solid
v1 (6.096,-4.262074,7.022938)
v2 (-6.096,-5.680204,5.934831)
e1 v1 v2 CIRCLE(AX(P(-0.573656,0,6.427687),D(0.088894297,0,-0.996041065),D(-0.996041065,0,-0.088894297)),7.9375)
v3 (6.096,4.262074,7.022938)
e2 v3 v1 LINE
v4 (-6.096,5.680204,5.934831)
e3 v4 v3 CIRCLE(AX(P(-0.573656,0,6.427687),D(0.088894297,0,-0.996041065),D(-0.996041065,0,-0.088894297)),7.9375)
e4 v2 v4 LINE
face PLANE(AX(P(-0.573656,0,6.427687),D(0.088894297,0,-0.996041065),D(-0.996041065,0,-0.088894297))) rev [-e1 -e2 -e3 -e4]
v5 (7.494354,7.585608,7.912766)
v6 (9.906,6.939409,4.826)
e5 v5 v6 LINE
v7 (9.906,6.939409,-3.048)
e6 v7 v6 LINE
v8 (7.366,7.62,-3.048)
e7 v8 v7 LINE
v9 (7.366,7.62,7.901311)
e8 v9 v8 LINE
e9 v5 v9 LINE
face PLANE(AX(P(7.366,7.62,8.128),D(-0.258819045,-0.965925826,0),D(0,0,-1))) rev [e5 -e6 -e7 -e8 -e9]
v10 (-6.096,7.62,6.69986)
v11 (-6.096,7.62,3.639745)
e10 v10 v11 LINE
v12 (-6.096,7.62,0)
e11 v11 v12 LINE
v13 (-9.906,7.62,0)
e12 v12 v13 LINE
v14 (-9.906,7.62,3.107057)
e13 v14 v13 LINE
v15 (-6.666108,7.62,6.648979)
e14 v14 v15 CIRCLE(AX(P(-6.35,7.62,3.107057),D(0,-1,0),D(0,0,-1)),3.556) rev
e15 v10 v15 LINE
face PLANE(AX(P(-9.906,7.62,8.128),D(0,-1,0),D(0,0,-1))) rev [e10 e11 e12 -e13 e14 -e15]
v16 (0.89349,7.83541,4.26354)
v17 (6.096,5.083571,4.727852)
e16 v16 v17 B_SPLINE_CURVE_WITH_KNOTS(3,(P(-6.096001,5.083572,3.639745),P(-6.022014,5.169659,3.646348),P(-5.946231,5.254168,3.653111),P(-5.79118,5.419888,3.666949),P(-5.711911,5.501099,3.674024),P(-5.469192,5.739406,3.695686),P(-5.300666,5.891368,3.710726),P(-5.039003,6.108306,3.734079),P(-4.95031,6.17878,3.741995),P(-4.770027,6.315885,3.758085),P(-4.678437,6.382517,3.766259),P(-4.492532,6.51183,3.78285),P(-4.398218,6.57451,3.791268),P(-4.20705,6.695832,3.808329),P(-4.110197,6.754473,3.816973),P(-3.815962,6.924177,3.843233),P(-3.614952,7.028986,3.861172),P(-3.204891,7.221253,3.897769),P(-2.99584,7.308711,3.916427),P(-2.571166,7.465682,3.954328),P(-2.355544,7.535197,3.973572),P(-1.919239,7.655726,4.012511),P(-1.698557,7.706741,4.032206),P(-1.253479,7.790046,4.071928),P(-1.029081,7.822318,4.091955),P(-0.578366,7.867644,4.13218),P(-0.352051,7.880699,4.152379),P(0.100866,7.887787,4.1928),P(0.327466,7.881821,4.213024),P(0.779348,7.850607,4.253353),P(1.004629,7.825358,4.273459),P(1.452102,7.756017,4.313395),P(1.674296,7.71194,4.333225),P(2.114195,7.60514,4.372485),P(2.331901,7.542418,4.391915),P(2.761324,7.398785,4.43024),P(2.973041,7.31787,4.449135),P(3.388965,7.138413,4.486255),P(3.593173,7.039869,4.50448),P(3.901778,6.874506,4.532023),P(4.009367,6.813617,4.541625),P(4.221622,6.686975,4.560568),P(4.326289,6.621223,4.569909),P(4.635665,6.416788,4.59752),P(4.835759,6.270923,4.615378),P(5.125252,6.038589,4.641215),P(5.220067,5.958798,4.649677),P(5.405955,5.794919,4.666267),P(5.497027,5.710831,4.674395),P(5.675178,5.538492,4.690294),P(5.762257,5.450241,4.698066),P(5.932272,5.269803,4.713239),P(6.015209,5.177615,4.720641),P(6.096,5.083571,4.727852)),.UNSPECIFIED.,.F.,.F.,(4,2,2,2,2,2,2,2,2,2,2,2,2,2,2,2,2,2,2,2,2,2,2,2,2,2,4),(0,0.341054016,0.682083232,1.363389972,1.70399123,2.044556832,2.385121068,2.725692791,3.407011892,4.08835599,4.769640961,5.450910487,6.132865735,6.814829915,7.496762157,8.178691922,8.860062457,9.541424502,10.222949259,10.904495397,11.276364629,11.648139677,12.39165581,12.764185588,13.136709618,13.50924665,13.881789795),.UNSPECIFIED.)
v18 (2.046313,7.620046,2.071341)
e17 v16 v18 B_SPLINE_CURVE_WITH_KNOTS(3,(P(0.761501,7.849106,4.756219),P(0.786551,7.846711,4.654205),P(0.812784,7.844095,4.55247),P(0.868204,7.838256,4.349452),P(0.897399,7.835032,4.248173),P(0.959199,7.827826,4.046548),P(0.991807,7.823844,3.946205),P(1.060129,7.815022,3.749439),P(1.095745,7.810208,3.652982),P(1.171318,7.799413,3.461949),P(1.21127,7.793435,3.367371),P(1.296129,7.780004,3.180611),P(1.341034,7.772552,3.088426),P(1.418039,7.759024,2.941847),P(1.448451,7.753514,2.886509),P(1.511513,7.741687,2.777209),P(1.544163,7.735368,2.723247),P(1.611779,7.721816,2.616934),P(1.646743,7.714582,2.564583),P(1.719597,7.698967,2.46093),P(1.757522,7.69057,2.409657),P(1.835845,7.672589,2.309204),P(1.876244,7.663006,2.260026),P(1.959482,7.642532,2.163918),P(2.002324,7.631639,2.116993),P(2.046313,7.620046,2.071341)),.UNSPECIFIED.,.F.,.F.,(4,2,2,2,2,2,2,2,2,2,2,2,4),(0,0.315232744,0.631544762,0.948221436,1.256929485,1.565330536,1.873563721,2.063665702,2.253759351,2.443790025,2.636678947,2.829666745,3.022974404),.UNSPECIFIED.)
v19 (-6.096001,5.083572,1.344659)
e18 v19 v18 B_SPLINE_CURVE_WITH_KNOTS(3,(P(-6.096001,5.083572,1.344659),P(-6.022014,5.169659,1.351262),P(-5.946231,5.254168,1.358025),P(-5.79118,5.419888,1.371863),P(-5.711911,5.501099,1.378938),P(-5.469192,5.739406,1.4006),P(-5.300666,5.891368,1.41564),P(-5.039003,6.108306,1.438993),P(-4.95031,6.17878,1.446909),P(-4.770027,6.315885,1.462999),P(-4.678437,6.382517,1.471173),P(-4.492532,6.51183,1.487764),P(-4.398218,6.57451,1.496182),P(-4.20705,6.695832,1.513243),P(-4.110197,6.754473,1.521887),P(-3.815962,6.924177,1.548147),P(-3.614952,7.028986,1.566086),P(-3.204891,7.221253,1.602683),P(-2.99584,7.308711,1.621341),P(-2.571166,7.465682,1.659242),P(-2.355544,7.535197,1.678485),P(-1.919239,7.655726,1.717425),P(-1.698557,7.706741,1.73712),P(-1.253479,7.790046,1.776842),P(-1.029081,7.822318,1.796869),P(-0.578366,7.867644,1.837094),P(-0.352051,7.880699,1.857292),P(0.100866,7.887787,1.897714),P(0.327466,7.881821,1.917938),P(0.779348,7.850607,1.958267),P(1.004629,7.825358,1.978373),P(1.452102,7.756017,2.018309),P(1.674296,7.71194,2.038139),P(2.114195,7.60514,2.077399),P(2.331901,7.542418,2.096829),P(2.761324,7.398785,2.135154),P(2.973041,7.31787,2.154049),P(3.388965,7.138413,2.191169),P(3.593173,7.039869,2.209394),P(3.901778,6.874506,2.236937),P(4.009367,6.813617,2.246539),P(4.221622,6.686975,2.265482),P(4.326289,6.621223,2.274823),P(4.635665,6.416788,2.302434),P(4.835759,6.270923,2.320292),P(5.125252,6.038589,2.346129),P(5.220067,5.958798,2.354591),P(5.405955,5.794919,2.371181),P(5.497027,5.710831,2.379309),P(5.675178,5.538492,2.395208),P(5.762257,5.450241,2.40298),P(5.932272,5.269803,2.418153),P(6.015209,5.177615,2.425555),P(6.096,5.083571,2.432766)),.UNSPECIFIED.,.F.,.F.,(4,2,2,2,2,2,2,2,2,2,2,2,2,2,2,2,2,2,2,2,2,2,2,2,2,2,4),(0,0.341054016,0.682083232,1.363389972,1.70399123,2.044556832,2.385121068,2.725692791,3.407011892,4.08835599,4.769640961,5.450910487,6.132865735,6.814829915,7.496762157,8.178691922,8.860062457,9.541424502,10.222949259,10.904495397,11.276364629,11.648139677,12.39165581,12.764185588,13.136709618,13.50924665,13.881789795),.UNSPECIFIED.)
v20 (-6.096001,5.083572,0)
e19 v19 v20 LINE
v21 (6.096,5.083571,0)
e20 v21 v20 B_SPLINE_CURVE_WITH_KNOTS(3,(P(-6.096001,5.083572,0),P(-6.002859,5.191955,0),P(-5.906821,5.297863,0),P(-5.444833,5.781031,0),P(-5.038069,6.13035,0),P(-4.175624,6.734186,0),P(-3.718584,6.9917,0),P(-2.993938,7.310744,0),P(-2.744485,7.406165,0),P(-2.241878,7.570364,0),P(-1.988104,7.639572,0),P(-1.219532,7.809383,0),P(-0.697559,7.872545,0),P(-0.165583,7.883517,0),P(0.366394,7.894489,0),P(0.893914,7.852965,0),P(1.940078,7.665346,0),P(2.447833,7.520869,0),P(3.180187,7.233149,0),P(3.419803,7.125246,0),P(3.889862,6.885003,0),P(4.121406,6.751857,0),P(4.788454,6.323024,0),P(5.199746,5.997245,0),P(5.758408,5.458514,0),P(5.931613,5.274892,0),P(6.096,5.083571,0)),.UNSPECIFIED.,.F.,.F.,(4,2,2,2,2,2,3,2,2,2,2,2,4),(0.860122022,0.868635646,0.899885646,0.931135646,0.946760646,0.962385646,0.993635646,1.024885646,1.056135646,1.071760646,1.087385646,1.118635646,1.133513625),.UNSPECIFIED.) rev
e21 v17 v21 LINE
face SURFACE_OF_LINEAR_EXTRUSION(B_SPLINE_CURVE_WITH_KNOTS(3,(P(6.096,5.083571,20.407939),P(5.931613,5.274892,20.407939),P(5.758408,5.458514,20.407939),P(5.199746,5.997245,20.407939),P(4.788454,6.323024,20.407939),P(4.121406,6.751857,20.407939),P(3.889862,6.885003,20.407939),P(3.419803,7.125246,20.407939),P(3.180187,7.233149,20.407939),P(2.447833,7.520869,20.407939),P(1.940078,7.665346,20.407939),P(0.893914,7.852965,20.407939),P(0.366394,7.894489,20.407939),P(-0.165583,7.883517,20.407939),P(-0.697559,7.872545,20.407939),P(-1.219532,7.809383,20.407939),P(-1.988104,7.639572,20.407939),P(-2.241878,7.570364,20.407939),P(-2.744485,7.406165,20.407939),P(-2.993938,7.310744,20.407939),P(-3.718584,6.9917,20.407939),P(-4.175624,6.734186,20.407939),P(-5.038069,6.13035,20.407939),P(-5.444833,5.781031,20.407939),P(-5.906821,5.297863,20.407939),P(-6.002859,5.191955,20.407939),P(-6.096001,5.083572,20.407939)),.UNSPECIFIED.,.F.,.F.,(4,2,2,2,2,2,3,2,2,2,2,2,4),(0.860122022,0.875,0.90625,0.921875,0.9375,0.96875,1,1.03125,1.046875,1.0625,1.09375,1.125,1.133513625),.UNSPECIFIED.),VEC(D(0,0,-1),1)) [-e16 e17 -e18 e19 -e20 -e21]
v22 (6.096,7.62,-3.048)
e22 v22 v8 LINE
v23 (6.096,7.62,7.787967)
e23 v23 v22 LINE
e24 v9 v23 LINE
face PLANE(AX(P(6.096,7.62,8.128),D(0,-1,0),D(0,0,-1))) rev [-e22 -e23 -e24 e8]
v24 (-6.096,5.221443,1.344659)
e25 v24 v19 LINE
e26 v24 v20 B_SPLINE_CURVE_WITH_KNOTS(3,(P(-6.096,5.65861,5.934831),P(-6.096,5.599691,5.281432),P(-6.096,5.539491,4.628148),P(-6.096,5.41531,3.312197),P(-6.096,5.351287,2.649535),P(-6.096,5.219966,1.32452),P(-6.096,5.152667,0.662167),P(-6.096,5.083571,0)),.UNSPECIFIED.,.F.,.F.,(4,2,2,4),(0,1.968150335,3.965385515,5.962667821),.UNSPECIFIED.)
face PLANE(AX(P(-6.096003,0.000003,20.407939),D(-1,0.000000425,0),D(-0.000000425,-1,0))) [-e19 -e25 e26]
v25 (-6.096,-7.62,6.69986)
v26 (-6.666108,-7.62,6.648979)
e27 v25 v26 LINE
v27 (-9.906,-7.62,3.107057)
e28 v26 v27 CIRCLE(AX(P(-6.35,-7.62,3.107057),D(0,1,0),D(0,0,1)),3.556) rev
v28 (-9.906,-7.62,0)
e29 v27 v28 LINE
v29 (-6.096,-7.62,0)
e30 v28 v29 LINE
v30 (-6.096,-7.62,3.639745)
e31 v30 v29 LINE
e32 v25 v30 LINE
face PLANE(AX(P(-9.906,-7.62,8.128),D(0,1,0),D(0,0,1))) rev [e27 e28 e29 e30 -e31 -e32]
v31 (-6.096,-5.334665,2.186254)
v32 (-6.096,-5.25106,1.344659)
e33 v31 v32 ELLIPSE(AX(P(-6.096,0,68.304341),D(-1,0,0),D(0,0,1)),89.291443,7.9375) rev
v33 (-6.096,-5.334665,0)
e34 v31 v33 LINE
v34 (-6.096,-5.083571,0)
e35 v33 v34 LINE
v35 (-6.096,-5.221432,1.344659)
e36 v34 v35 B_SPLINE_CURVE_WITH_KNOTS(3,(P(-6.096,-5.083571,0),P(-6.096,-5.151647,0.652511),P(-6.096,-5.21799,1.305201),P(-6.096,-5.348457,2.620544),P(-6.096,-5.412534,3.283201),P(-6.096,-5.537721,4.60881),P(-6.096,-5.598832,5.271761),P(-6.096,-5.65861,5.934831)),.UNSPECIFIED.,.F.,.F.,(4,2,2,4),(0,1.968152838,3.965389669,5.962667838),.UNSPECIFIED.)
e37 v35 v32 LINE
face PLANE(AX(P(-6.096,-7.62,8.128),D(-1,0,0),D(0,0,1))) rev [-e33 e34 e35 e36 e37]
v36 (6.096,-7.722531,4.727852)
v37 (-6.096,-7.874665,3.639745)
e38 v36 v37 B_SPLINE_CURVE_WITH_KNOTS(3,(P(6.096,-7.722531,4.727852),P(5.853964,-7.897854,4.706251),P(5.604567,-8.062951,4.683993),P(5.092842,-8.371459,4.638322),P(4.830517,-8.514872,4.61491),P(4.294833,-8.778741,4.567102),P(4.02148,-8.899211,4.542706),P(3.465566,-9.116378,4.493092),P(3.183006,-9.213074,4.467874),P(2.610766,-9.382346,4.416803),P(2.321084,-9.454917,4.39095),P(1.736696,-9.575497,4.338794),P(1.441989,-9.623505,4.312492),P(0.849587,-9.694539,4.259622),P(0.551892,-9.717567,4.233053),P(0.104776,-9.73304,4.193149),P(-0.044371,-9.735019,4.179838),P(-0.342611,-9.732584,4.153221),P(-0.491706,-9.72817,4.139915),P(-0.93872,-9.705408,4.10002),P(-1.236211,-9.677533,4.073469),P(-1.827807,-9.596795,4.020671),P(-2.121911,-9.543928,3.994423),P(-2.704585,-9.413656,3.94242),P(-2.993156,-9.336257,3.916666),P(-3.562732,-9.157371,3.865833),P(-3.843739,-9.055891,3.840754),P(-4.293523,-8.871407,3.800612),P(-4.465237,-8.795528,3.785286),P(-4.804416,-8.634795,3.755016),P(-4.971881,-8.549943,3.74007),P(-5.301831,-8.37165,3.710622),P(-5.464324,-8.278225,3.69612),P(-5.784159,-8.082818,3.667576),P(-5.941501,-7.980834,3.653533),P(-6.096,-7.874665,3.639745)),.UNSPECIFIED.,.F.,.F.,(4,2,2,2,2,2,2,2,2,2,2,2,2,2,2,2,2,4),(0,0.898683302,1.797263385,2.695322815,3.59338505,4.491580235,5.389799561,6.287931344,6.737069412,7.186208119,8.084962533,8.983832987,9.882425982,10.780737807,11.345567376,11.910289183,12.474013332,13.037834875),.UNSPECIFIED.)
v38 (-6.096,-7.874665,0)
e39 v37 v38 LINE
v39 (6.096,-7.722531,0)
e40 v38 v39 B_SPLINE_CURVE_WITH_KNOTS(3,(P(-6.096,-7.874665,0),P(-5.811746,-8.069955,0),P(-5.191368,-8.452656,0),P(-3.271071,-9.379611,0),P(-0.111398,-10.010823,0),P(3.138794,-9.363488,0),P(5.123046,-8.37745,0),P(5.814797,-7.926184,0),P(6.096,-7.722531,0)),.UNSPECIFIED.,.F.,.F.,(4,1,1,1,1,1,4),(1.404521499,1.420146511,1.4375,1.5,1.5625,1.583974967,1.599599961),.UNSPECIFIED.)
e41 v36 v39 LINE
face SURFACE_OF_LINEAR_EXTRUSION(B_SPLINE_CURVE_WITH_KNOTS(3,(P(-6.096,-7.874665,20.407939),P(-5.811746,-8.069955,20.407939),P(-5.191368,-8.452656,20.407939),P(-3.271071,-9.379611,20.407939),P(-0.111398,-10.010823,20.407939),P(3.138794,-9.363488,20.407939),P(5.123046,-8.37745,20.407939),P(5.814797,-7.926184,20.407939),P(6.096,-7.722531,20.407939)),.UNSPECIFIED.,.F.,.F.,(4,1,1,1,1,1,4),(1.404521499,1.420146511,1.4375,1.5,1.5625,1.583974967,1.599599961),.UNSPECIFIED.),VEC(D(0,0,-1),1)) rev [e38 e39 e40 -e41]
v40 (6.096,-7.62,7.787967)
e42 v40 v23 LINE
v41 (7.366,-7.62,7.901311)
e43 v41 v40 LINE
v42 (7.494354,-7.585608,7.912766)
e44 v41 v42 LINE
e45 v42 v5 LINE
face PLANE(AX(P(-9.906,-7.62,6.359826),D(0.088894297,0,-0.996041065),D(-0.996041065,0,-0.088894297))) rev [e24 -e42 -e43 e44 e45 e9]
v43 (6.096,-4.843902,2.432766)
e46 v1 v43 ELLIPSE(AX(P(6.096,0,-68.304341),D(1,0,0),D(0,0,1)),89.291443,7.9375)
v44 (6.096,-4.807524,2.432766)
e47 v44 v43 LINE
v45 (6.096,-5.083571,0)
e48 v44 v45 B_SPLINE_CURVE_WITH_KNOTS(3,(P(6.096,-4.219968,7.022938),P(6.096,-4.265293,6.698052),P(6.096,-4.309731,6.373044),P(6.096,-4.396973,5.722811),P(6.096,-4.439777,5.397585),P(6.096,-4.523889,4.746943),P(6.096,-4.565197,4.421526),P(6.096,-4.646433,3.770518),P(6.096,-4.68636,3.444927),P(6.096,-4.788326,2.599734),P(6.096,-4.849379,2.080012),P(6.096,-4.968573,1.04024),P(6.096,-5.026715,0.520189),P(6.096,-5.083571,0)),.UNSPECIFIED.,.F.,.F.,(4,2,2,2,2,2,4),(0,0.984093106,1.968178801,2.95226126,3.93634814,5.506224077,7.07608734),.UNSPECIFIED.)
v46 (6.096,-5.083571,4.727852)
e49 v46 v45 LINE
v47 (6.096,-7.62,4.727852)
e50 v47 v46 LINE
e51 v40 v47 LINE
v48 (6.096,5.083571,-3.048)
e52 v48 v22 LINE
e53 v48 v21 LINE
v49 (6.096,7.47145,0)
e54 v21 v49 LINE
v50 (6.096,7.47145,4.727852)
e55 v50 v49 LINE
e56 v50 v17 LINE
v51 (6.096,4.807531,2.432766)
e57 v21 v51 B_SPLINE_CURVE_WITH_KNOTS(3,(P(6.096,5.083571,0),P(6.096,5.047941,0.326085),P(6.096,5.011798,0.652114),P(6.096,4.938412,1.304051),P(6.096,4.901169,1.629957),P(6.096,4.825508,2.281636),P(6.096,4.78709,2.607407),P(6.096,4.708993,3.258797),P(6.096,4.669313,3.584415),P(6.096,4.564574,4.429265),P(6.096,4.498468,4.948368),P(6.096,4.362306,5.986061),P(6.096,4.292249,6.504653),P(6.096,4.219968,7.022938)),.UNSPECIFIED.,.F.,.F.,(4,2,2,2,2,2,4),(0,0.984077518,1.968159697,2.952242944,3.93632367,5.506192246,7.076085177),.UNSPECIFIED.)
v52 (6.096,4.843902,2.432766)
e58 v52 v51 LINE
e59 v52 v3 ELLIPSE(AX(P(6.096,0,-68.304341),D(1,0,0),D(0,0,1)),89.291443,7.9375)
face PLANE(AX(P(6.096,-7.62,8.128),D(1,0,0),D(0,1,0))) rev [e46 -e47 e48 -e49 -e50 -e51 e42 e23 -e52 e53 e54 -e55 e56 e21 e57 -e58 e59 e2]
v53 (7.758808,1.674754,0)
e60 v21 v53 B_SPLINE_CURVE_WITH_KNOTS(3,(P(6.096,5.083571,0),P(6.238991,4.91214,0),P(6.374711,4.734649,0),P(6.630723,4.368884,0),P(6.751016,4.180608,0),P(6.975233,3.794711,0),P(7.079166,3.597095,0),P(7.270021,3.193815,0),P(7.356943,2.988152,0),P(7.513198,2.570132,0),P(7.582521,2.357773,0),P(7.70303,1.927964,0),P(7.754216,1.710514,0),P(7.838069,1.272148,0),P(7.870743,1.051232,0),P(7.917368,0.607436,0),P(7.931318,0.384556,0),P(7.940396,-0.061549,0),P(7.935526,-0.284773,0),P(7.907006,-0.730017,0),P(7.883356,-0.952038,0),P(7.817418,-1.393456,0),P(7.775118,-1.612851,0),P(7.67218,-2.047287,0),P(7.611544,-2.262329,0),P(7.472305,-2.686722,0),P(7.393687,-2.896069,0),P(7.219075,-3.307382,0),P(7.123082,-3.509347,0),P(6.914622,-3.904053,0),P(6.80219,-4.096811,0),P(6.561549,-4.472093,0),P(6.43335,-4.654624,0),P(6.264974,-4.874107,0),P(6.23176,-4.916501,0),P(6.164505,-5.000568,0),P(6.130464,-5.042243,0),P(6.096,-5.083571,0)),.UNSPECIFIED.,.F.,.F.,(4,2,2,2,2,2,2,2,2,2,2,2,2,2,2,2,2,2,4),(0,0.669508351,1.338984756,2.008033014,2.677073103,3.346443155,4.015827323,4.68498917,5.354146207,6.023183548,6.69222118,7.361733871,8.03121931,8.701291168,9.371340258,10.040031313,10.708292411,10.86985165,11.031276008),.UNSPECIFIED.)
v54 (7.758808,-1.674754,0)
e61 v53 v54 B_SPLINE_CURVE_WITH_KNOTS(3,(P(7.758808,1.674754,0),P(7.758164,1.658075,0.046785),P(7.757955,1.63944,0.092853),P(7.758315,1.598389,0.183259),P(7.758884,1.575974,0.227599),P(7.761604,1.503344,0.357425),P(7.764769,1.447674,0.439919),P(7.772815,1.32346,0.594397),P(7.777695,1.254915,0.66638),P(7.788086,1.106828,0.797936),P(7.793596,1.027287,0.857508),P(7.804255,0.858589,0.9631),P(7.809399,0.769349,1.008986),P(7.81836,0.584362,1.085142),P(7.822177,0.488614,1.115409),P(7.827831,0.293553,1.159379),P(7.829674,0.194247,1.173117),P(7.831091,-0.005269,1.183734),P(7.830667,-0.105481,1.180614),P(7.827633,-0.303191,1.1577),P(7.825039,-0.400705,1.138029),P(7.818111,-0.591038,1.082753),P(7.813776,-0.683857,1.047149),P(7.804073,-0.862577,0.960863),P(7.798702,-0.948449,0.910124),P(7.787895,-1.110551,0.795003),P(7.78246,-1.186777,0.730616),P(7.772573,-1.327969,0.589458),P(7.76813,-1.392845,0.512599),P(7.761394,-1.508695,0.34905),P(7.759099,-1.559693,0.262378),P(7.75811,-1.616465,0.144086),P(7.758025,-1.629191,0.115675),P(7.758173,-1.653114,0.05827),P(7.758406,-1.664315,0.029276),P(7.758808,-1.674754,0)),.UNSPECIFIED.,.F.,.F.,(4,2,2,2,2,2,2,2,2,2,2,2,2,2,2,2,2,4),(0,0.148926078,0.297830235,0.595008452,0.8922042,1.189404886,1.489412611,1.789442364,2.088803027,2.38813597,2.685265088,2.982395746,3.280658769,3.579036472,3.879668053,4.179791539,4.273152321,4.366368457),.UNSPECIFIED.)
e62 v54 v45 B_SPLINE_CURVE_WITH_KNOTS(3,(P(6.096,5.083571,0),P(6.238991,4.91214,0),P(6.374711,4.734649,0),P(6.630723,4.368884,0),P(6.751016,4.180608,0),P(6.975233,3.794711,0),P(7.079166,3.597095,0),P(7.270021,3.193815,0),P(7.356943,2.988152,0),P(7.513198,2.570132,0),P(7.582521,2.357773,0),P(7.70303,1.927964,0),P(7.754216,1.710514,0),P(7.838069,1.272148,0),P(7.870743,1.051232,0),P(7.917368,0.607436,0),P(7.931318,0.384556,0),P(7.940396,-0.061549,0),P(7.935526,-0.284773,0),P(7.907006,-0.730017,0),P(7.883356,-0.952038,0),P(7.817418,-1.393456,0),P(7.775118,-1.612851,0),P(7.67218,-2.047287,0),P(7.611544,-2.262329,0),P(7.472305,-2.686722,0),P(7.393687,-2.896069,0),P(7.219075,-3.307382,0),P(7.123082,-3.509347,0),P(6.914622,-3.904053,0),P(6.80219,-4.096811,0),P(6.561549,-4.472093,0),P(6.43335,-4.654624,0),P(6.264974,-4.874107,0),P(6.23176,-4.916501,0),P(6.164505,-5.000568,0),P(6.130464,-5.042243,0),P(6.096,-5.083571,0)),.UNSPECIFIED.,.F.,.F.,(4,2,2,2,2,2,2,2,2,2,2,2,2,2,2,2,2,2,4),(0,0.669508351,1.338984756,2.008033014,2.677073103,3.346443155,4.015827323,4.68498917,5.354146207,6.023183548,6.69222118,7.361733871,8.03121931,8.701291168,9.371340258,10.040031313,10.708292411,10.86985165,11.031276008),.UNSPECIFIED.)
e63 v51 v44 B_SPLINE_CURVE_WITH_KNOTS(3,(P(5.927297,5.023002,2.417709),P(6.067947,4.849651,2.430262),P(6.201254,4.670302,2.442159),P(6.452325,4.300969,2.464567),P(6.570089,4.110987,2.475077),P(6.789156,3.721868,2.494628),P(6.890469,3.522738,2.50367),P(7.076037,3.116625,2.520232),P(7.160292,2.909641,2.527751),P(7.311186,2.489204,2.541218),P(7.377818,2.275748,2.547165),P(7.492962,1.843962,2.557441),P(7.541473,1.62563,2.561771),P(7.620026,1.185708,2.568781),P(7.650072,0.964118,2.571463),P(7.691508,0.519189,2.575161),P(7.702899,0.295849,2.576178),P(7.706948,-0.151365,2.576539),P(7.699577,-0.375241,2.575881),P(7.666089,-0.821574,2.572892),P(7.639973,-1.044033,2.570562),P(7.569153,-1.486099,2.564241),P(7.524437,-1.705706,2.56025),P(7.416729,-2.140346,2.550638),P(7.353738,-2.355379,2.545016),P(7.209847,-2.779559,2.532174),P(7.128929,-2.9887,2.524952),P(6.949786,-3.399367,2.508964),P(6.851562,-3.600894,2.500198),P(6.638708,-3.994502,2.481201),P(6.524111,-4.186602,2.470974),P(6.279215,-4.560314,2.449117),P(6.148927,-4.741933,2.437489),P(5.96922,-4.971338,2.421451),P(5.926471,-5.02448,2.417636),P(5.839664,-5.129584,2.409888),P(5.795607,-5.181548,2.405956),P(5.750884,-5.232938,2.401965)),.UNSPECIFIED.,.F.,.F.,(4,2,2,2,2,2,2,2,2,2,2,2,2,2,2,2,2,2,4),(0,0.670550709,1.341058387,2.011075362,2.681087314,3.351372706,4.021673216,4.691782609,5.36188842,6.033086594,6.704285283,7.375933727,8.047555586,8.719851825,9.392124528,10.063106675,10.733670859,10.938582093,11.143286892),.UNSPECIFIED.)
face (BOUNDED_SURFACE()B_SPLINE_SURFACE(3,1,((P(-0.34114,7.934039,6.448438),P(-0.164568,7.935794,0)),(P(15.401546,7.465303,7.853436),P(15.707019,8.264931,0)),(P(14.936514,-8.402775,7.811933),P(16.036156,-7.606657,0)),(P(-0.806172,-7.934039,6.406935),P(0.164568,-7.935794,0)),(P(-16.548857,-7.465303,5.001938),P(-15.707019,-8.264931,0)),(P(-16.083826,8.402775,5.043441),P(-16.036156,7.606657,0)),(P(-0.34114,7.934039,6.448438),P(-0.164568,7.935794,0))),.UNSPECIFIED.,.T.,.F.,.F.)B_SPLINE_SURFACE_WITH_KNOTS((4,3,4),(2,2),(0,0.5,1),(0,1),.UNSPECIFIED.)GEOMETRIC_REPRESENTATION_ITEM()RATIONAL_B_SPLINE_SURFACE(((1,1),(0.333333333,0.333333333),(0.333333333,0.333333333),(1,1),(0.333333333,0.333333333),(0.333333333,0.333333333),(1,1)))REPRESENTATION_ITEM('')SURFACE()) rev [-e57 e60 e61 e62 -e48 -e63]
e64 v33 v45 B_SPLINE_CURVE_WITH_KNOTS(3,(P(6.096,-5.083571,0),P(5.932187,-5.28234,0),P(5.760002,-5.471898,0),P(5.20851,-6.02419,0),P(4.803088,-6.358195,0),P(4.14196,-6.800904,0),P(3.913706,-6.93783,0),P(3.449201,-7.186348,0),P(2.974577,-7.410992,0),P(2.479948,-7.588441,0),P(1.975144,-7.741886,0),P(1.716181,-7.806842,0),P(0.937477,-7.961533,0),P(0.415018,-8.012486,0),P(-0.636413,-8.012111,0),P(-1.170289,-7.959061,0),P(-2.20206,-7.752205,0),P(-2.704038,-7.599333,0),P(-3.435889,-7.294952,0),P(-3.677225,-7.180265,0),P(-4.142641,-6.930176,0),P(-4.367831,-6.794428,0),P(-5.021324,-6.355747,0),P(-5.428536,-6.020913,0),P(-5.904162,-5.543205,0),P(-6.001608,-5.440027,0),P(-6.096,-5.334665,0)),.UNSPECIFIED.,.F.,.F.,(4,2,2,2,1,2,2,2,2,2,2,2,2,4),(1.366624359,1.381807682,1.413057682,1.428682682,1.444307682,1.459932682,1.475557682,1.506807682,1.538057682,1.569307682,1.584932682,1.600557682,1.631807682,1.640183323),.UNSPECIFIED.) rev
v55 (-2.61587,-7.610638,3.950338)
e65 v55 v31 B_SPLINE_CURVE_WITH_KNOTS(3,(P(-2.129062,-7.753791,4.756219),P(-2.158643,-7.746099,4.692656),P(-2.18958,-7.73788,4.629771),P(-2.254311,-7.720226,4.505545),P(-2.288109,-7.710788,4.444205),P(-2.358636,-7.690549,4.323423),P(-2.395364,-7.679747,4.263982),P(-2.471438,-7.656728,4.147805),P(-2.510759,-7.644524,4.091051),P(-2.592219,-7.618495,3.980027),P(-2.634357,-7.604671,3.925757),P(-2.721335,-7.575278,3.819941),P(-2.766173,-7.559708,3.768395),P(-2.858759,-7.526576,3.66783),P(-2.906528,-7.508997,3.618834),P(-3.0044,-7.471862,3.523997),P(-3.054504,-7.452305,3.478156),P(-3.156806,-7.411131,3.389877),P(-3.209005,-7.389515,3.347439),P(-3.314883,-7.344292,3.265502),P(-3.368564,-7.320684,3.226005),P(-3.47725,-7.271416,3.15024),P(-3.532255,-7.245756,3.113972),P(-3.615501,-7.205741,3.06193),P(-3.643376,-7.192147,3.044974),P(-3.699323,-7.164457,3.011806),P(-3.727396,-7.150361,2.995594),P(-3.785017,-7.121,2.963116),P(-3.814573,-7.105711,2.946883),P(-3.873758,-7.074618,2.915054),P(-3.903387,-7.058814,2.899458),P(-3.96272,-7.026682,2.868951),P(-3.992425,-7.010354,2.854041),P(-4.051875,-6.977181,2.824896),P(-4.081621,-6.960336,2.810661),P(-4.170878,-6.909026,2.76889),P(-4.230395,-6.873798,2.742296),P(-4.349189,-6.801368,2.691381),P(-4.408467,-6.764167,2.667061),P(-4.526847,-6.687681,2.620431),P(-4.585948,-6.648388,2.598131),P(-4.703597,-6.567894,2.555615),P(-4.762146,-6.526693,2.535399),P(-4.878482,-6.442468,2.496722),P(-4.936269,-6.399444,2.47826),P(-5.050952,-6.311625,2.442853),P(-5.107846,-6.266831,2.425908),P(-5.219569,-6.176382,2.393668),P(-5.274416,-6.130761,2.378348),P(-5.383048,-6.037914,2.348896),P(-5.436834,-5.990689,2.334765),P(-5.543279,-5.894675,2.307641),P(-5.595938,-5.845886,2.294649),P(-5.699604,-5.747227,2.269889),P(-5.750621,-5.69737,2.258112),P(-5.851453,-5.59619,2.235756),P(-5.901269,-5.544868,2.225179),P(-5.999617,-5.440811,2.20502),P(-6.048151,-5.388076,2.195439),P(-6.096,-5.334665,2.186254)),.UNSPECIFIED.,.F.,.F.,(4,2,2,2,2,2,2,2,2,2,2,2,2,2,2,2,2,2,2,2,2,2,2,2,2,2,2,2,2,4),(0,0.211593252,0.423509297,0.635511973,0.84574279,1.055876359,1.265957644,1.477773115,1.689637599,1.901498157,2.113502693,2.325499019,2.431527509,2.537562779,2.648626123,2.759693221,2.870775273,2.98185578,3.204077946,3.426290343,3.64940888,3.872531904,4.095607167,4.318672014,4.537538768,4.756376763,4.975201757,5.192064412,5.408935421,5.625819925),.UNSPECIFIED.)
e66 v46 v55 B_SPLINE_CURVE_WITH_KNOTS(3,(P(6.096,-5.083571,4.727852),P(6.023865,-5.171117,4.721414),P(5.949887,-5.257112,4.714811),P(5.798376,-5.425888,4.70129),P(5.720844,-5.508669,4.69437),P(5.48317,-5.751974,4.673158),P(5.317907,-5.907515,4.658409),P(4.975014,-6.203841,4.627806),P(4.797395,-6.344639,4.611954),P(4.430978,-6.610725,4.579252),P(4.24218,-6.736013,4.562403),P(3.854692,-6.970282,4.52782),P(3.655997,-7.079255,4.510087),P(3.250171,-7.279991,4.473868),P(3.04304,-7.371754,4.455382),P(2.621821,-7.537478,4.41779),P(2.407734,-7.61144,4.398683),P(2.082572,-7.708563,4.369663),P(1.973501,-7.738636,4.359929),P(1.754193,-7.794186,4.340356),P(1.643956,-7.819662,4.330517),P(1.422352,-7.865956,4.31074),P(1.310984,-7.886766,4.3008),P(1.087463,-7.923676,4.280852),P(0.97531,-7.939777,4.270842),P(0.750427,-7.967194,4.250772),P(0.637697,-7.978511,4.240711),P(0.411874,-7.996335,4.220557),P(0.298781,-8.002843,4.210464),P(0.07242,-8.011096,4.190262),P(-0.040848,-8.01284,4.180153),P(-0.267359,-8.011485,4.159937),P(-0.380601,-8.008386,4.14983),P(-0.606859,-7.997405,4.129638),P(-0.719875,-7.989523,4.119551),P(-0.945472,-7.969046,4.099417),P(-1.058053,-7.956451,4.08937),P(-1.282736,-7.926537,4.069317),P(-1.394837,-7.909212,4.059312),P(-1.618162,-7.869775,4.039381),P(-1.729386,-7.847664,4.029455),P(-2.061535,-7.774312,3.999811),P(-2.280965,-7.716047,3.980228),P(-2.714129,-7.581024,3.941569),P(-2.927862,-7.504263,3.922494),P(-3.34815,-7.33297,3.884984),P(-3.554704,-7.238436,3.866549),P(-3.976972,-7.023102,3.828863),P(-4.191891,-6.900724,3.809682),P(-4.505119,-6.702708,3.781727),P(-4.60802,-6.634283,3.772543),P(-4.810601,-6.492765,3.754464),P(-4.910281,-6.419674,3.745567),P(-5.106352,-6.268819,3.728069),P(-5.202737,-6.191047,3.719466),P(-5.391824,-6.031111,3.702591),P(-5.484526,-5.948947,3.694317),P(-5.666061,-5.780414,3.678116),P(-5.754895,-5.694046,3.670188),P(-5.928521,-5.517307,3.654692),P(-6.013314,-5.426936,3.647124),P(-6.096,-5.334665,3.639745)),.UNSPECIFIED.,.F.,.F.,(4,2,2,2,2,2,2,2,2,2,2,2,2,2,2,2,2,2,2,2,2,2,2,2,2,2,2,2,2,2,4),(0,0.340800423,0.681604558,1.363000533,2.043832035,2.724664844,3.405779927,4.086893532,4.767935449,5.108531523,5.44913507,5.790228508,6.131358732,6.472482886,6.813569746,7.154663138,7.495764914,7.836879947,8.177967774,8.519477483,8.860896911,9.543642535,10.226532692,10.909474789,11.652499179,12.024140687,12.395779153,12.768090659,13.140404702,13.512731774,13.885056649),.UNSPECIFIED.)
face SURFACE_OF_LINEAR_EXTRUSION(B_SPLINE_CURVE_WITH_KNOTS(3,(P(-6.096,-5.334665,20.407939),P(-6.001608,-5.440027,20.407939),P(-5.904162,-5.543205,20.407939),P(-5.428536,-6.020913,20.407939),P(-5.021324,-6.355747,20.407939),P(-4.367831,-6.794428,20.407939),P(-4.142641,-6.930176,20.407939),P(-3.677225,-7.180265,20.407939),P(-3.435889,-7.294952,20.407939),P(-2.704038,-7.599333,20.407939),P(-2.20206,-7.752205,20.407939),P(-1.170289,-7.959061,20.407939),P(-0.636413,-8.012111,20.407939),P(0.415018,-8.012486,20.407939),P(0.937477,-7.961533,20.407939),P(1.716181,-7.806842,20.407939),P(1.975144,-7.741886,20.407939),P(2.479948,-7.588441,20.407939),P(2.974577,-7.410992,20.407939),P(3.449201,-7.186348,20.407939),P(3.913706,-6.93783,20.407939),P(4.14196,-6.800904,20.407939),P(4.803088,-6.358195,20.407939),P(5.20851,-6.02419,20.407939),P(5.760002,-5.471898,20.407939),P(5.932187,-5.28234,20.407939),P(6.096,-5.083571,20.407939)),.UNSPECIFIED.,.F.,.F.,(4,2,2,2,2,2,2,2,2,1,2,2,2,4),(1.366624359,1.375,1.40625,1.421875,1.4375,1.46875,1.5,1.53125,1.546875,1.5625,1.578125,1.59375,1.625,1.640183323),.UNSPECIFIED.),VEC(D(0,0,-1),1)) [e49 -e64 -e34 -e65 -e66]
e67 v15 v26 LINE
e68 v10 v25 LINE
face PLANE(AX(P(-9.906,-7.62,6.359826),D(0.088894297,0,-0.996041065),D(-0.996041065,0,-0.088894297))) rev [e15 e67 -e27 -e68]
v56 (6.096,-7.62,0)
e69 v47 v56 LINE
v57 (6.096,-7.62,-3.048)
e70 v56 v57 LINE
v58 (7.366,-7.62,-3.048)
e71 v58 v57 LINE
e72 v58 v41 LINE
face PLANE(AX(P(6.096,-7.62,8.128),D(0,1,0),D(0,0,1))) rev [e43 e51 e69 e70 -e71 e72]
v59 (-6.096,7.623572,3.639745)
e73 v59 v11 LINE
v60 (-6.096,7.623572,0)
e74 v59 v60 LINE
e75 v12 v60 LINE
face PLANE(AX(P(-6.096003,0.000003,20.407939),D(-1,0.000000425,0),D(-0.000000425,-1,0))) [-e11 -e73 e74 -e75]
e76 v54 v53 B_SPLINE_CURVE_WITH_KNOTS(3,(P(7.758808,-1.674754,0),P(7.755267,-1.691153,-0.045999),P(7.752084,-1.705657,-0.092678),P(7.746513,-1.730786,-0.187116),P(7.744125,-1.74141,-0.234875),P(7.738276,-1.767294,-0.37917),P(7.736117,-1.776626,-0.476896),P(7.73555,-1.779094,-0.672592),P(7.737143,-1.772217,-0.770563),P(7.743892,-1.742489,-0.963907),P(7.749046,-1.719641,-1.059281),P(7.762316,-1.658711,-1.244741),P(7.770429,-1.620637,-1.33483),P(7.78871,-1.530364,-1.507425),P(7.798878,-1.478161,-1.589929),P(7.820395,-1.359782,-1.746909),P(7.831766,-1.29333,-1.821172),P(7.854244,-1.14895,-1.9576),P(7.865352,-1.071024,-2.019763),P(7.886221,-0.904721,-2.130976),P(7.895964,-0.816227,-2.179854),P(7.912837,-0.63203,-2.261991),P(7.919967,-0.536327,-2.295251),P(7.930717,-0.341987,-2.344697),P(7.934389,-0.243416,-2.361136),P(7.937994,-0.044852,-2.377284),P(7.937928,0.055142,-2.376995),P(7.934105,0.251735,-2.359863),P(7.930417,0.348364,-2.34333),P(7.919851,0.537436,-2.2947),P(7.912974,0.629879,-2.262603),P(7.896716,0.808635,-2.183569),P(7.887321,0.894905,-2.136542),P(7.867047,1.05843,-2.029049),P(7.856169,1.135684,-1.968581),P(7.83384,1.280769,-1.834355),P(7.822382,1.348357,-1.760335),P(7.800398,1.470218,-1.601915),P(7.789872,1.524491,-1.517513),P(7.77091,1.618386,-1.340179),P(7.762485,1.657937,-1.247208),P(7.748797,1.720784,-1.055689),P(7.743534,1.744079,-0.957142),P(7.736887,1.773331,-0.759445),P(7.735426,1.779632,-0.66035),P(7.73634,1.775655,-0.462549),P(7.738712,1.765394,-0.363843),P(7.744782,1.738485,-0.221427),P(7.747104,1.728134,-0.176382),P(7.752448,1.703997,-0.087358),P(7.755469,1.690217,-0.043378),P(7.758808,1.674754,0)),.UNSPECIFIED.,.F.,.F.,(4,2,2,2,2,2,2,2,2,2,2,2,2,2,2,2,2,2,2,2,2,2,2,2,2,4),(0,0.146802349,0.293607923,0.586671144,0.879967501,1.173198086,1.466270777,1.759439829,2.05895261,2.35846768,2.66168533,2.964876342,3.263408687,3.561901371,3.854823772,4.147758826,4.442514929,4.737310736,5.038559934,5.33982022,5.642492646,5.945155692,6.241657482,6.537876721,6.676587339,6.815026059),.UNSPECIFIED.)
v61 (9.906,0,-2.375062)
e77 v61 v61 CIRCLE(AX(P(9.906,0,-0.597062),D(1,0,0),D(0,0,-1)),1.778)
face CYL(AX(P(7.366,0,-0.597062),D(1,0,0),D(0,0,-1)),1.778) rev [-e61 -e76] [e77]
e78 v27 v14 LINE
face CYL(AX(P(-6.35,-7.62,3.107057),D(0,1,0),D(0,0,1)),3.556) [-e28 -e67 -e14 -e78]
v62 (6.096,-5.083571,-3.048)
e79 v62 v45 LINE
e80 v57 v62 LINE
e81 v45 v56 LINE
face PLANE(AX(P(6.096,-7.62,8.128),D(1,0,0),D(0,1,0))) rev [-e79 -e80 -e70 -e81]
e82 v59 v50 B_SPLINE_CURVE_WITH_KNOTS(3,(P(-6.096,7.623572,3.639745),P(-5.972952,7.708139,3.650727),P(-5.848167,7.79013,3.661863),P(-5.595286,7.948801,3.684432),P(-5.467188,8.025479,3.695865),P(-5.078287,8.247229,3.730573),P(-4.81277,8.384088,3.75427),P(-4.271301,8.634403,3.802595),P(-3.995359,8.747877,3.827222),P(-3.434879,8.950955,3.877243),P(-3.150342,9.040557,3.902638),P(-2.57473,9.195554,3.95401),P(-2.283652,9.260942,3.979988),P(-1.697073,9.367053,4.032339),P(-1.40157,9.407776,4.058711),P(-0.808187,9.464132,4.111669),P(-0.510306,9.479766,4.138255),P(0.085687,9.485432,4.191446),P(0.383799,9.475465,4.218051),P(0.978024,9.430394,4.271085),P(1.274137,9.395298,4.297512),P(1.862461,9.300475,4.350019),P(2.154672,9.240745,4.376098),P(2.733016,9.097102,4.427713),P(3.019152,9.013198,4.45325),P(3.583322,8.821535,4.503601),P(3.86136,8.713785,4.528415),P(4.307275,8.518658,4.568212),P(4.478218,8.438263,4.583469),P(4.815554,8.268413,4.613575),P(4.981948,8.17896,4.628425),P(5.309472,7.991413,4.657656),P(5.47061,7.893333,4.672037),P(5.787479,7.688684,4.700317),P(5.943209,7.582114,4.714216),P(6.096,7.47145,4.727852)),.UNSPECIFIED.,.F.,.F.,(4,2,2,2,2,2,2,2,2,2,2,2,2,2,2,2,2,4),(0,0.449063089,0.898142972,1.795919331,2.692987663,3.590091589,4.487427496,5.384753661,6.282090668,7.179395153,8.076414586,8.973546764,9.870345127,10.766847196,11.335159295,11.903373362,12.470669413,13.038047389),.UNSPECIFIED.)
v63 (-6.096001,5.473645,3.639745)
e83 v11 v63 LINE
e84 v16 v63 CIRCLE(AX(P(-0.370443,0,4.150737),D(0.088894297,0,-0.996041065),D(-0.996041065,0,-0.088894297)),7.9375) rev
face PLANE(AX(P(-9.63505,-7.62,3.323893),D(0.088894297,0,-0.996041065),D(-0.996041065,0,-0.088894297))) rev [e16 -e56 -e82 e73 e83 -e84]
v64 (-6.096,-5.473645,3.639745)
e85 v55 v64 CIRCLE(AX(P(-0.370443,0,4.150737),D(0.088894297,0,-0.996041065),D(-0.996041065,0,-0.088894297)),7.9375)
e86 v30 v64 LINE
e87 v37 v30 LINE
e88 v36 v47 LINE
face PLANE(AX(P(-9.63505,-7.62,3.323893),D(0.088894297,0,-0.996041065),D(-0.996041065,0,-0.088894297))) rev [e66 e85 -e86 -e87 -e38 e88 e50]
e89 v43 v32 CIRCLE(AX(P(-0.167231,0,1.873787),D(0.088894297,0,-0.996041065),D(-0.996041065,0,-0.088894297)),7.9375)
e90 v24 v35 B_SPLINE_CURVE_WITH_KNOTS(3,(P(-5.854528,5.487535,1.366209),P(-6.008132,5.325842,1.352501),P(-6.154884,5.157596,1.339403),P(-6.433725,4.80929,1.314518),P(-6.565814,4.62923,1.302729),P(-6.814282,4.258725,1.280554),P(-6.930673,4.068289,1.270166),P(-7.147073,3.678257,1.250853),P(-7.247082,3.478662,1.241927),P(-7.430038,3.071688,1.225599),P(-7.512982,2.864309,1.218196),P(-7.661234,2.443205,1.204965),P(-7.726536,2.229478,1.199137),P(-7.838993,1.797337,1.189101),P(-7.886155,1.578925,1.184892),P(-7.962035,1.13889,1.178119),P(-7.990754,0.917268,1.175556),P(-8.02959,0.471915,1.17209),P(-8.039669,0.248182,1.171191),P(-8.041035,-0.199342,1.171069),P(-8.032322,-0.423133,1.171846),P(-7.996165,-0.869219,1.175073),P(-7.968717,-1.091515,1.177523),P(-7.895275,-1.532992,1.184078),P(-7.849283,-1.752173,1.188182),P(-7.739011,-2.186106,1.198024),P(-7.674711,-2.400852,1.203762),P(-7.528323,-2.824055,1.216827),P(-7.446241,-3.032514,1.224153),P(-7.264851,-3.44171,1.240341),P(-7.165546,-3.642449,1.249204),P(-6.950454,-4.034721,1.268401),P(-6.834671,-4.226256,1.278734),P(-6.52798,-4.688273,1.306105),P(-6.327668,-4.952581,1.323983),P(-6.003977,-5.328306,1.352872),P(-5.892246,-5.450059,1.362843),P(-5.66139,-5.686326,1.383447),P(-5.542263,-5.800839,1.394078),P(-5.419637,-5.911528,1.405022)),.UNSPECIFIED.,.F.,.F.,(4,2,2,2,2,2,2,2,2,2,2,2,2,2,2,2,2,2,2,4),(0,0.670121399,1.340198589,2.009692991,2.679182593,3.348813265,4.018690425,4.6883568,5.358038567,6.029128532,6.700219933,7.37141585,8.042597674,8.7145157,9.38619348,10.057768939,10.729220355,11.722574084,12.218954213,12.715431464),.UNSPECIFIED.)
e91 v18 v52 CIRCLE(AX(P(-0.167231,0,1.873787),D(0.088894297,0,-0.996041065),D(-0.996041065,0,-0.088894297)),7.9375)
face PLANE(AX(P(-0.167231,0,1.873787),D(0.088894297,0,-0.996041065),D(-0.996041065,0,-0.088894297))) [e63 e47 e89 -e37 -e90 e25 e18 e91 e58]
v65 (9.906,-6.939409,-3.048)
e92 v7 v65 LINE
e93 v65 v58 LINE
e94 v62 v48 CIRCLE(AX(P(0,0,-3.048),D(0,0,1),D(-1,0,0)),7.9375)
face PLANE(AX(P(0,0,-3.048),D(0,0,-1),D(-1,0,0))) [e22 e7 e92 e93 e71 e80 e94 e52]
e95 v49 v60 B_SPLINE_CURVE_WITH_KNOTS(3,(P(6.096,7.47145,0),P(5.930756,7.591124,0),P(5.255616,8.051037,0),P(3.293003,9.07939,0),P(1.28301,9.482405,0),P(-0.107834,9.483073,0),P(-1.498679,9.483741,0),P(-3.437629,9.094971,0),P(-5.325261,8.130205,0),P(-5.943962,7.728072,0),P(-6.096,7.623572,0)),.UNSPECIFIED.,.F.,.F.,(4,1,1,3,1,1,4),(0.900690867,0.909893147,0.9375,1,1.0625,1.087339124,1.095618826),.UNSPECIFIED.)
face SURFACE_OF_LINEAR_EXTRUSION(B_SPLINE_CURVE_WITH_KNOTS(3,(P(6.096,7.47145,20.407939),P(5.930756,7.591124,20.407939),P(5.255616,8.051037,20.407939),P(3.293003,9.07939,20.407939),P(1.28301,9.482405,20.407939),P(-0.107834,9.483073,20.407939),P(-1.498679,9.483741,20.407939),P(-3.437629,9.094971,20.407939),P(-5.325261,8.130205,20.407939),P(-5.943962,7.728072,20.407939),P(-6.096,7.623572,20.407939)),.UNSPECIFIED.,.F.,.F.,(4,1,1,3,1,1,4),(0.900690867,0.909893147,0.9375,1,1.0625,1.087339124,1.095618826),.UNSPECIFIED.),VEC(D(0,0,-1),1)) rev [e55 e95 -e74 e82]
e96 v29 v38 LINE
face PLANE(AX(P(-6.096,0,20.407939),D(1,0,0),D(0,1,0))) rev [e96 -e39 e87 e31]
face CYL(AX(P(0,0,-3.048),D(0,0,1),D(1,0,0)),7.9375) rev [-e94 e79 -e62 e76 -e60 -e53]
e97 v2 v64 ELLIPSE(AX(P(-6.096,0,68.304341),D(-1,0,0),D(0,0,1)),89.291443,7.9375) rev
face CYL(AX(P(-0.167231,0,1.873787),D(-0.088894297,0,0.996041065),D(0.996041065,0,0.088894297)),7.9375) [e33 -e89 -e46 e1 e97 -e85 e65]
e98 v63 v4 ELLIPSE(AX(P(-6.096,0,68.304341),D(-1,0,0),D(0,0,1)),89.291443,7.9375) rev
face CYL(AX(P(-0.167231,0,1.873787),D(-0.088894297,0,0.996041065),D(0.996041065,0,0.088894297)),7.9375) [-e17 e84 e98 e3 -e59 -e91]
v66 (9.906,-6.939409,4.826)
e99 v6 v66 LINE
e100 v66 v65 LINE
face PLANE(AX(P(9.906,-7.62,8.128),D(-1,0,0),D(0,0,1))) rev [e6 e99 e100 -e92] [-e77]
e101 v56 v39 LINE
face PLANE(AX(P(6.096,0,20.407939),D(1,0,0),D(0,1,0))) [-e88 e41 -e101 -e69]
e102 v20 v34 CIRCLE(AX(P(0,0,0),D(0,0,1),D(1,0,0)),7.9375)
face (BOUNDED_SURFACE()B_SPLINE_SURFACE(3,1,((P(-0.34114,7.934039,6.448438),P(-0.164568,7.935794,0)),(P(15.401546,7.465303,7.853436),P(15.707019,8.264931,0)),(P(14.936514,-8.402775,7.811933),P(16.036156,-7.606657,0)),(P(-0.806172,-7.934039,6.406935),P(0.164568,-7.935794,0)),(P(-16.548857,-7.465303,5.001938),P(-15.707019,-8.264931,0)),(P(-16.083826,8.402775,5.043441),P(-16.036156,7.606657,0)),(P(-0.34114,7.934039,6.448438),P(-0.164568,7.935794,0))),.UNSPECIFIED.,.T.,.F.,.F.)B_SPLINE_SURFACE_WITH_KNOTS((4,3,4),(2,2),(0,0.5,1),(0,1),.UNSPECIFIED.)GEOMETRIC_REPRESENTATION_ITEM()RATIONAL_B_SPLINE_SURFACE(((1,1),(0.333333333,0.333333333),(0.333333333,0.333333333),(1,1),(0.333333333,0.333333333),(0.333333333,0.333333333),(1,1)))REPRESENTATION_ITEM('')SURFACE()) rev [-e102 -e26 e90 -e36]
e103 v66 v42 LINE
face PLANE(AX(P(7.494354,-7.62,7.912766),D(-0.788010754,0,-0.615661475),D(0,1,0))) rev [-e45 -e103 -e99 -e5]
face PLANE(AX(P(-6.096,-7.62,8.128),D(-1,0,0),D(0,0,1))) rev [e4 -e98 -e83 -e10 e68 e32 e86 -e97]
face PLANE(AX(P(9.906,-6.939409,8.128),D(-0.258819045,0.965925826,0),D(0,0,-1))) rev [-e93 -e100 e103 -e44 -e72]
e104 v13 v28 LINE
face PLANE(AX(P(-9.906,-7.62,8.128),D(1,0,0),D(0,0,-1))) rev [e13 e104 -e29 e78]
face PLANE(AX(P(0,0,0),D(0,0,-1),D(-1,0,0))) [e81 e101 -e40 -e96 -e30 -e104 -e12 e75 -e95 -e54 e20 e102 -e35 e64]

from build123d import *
from OCP.BRepFilletAPI import BRepFilletAPI_MakeChamfer

# Parameters (mm, degrees)
SKETCH1_W                         = 3.81
SKETCH1_H                         = 15.24
BOSS_EXTRUDE1_DEPTH               = 8.128
BOSS_EXTRUDE1_2_DEPTH             = 8.128
CUT_EXTRUDE2_DEPTH                = 20.911072799
SKETCH12_R                        = 7.9375
MAGNET_DEPTH                      = 4.572
BOSS_EXTRUDE6_DEPTH               = 3.048
SKETCH14_R                        = 1.778
CUT_EXTRUDE4_DEPTH                = 2.54
CHAMFER3_SIZE                     = 2.54
CHAMFER3_SIZE2                    = 0.680590949
CHAMFER4_SIZE                     = 2.54
CHAMFER4_SIZE2                    = 0.680590949
CHAMFER5_SIZE                     = 3.302
CHAMFER5_SIZE2                    = 2.421231652
BOSS_EXTRUDE7_REACH               = 20.006
BOSS_EXTRUDE7_OFFSET_FROM_SURFACE = 3.048
FILLET1_R                         = 3.556


with BuildPart() as part:
    # Sketch1 → Boss-Extrude1 (new body)
    with BuildSketch(Plane.XY):
        with Locations((-8.001, 0)):
            Rectangle(SKETCH1_W, SKETCH1_H)
    extrude(amount=BOSS_EXTRUDE1_DEPTH)


with BuildPart() as body_2:
    # Sketch1 → Boss-Extrude1 2 (new body)
    with BuildSketch(Plane.XY):
        with Locations((8.001, 0)):
            Rectangle(SKETCH1_W, SKETCH1_H)
    extrude(amount=BOSS_EXTRUDE1_2_DEPTH)


with BuildPart() as cut_extrude2_tool:
    # Sketch6 → Cut-Extrude2 (new, through all)
    with BuildSketch(Plane(origin=(0, 7.62, 0), x_dir=(1, 0, 0), z_dir=(0, 1, 0))):
        Polygon((-9.906, -6.359826106), (9.906, -8.128), (-9.906, -8.128), align=None)
    extrude(amount=-CUT_EXTRUDE2_DEPTH)


with BuildPart() as part_1:
    add(part.part)

    # Cut-Extrude2: cut by cut_extrude2_tool
    add(cut_extrude2_tool.part, mode=Mode.SUBTRACT)

    # Cut-Loft1: read off the stored shape, not the designer's step
    # Cut-Loft1: loft between two sections, ruled curve by curve
    cut_loft1_from = [
        Edge.make_bspline([(-0.341139785, 7.934039191, 6.44843844), (15.401545931, 7.465303163, 7.853435709), (14.936513948, -8.402775219, 7.811932711), (-0.806171769, -7.934039191, 6.406935441), (-16.548857485, -7.465303163, 5.001938171), (-16.083825501, 8.402775219, 5.04344117), (-0.341139785, 7.934039191, 6.44843844)], [0, 0, 0, 0, 0.5, 0.5, 0.5, 1, 1, 1, 1], 3, [1, 0.333333333, 0.333333333, 1, 0.333333333, 0.333333333, 1]),
    ]
    cut_loft1_to = [
        Edge.make_bspline([(-0.164568393, 7.935793816, 0), (15.70701924, 8.264930602, 0), (16.036156025, -7.606657031, 0), (0.164568393, -7.935793816, 0), (-15.70701924, -8.264930602, 0), (-16.036156025, 7.606657031, 0), (-0.164568393, 7.935793816, 0)], [0, 0, 0, 0, 0.5, 0.5, 0.5, 1, 1, 1, 1], 3, [1, 0.333333333, 0.333333333, 1, 0.333333333, 0.333333333, 1]),
    ]
    cut_loft1 = Solid(Shell([*[Face.make_surface_from_curves(cut_loft1_from[k], cut_loft1_to[k]) for k in range(1)], Face(Wire(cut_loft1_from)), Face(Wire(cut_loft1_to))]))
    add(cut_loft1, mode=Mode.SUBTRACT)


with BuildPart() as body_2_1:
    add(body_2.part)

    # Cut-Extrude2: cut by cut_extrude2_tool
    add(cut_extrude2_tool.part, mode=Mode.SUBTRACT)

    # Cut-Loft1 2: loft between two sections, ruled curve by curve
    cut_loft1_2_from = [
        Edge.make_bspline([(-0.341139785, 7.934039191, 6.44843844), (15.401545931, 7.465303163, 7.853435709), (14.936513948, -8.402775219, 7.811932711), (-0.806171769, -7.934039191, 6.406935441), (-16.548857485, -7.465303163, 5.001938171), (-16.083825501, 8.402775219, 5.04344117), (-0.341139785, 7.934039191, 6.44843844)], [0, 0, 0, 0, 0.5, 0.5, 0.5, 1, 1, 1, 1], 3, [1, 0.333333333, 0.333333333, 1, 0.333333333, 0.333333333, 1]),
    ]
    cut_loft1_2_to = [
        Edge.make_bspline([(-0.164568393, 7.935793816, 0), (15.70701924, 8.264930602, 0), (16.036156025, -7.606657031, 0), (0.164568393, -7.935793816, 0), (-15.70701924, -8.264930602, 0), (-16.036156025, 7.606657031, 0), (-0.164568393, 7.935793816, 0)], [0, 0, 0, 0, 0.5, 0.5, 0.5, 1, 1, 1, 1], 3, [1, 0.333333333, 0.333333333, 1, 0.333333333, 0.333333333, 1]),
    ]
    cut_loft1_2 = Solid(Shell([*[Face.make_surface_from_curves(cut_loft1_2_from[k], cut_loft1_2_to[k]) for k in range(1)], Face(Wire(cut_loft1_2_from)), Face(Wire(cut_loft1_2_to))]))
    add(cut_loft1_2, mode=Mode.SUBTRACT)


with BuildPart() as body_3:
    # Sketch12 → Magnet (new body)
    with BuildSketch(Plane(origin=(-0.573655777, 0, 6.42768694), x_dir=(-0.9960410654107703, 0, -0.08889429686643446), z_dir=(0.08889429686643446, 0, -0.9960410654107703))):
        Circle(SKETCH12_R)
    extrude(amount=MAGNET_DEPTH)


with BuildPart() as body_4:
    # Sketch13 → Boss-Extrude6 (new body)
    with BuildSketch(Plane(origin=(0, 0, 0), x_dir=(-1, 0, 0), z_dir=(0, 0, -1))):
        with BuildLine():
            Line((-6.096, 5.08357062), (-6.096, 7.62))
            Line((-6.096, 7.62), (-9.906, 7.62))
            Line((-9.906, 7.62), (-9.906, -7.62))
            Line((-9.906, -7.62), (-6.096, -7.62))
            Line((-6.096, -7.62), (-6.096, -5.08357062))
            ThreePointArc((-6.096, -5.08357062), (-7.9375, 0), (-6.096, 5.08357062))
        make_face()
    extrude(amount=BOSS_EXTRUDE6_DEPTH)


with BuildPart() as cut_extrude4_tool:
    # Sketch14 → Cut-Extrude4 (new body)
    with BuildSketch(Plane(origin=(9.906, 0, 0), x_dir=(0, 0, -1), z_dir=(1, 0, 0))):
        with Locations((0.597062067, -1.1e-08)):
            Circle(SKETCH14_R)
    extrude(amount=-CUT_EXTRUDE4_DEPTH)


with BuildPart() as body_2_2:
    add(body_2_1.part)

    # Cut-Extrude4: cut by cut_extrude4_tool
    add(cut_extrude4_tool.part, mode=Mode.SUBTRACT)

    # Chamfer3: one chamfer whose edges measure the first distance from different faces: ONE call of the kernel's chamfer builder (chamfer() names one face for all edges)
    chamfer3_edges_1 = [body_2_2.edges().sort_by_distance(p)[0] for p in [
        (9.906, -7.62, 4.064),
    ]]
    chamfer3_side_1 = [body_2_2.faces().sort_by_distance(p)[0] for p in [
        (8.014566329, -7.62, 3.979597021),
    ]]
    chamfer3_edges_2 = [body_2_2.edges().sort_by_distance(p)[0] for p in [
        (9.906, 7.62, 4.064),
    ]]
    chamfer3_side_2 = [body_2_2.faces().sort_by_distance(p)[0] for p in [
        (8.014566329, 7.62, 3.979597021),
    ]]
    chamfer3 = BRepFilletAPI_MakeChamfer(body_2_2.part.solid().wrapped)
    for e in chamfer3_edges_1:
        chamfer3.Add(CHAMFER3_SIZE, CHAMFER3_SIZE2, e.wrapped, chamfer3_side_1[0].wrapped)  # the first distance lies on this face
    for e in chamfer3_edges_2:
        chamfer3.Add(CHAMFER3_SIZE, CHAMFER3_SIZE2, e.wrapped, chamfer3_side_2[0].wrapped)  # the first distance lies on this face
    add(Compound.cast(chamfer3.Shape()), mode=Mode.REPLACE)

    # Chamfer5
    chamfer5_edges = [body_2_2.edges().sort_by_distance(p)[0] for p in [
        (9.906, 0, 8.128),
    ]]
    chamfer5_side = [body_2_2.faces().sort_by_distance(p)[0] for p in [
        (9.906, 0, 4.157766254),
    ]]
    chamfer(chamfer5_edges, length=CHAMFER5_SIZE, length2=CHAMFER5_SIZE2, reference=chamfer5_side[0])

    # Boss-Extrude7: up to this face of the body (flat: up to its plane, moved by the offset)
    boss_extrude7_end = Plane(body_2_2.part.faces().sort_by_distance((6.795040928, 0, 7.8503543))[0]).offset(-BOSS_EXTRUDE7_OFFSET_FROM_SURFACE)
    # Sketch15 → Boss-Extrude7 (add, up to the picked face)
    with BuildSketch(Plane.XY, mode=Mode.PRIVATE) as boss_extrude7_sk1:
        with BuildLine():
            Line((6.096, 5.08357062), (6.096, 7.471449808))
            add(Edge.make_bspline(
                [(6.096, 7.471449808), (5.930756217, 7.591123534), (5.255615528, 8.051037173), (3.293003266, 9.079390192), (1.283010021, 9.48240548), (-0.107834445, 9.483073279), (-1.498678912, 9.483741079), (-3.43762918, 9.094971238), (-5.325260948, 8.130204629), (-5.94396227, 7.728072028), (-6.096, 7.623571521)],
                knots=[0.900690867, 0.900690867, 0.900690867, 0.900690867, 0.909893147, 0.9375, 1, 1, 1, 1.0625, 1.087339124, 1.095618826, 1.095618826, 1.095618826, 1.095618826], degree=3))
            Line((-6.096, 7.623571521), (-6.096001081, 5.083571521))
            add(Edge.make_bspline(
                [(6.096, 5.08357062), (5.93161291, 5.274891544), (5.758408134, 5.458513784), (5.199745975, 5.997244915), (4.788453523, 6.323024277), (4.121406265, 6.751856672), (3.889862409, 6.885002693), (3.419802681, 7.125246454), (3.180186729, 7.23314886), (2.447832586, 7.520869047), (1.940077624, 7.665345536), (0.893913787, 7.852965093), (0.366394093, 7.894488776), (-0.165582558, 7.883517088), (-0.697559209, 7.8725454), (-1.219532269, 7.809382621), (-1.988103649, 7.639571774), (-2.241878196, 7.570363771), (-2.744485351, 7.406164502), (-2.993938175, 7.310744438), (-3.718584086, 6.991700252), (-4.175623921, 6.734186385), (-5.038069326, 6.130349805), (-5.444832888, 5.781030811), (-5.906820855, 5.29786321), (-6.002858614, 5.191954979), (-6.096001081, 5.083571521)],
                knots=[0.860122022, 0.860122022, 0.860122022, 0.860122022, 0.875, 0.875, 0.90625, 0.90625, 0.921875, 0.921875, 0.9375, 0.9375, 0.96875, 0.96875, 1, 1, 1, 1.03125, 1.03125, 1.046875, 1.046875, 1.0625, 1.0625, 1.09375, 1.09375, 1.125, 1.125, 1.133513625, 1.133513625, 1.133513625, 1.133513625], degree=3))
        make_face()
    boss_extrude7_tool1 = split(extrude(boss_extrude7_sk1.sketch, amount=BOSS_EXTRUDE7_REACH, mode=Mode.PRIVATE), bisect_by=boss_extrude7_end, keep=Keep.BOTH, mode=Mode.PRIVATE)
    # Sketch15 → Boss-Extrude7 (add, up to the picked face)
    with BuildSketch(Plane.XY, mode=Mode.PRIVATE) as boss_extrude7_sk2:
        with BuildLine():
            add(Edge.make_bspline(
                [(-6.096, -5.334665385), (-6.001608062, -5.440026559), (-5.904161756, -5.543205008), (-5.428535567, -6.020913198), (-5.021324344, -6.355746552), (-4.367831042, -6.794427859), (-4.142640685, -6.930176212), (-3.677224948, -7.180264747), (-3.435889004, -7.294952261), (-2.704038324, -7.599333248), (-2.202060233, -7.75220516), (-1.170288992, -7.959061026), (-0.636413301, -8.012110875), (0.415017809, -8.012485804), (0.937476738, -7.961532915), (1.716181401, -7.806841712), (1.975144289, -7.741886149), (2.479947756, -7.588440875), (2.974576658, -7.410991551), (3.449201256, -7.186347645), (3.913706318, -6.937829508), (4.141960005, -6.800903506), (4.803088275, -6.358194944), (5.208510395, -6.024190383), (5.760001551, -5.471897601), (5.932187446, -5.282339739), (6.096, -5.08357062)],
                knots=[1.366624359, 1.366624359, 1.366624359, 1.366624359, 1.375, 1.375, 1.40625, 1.40625, 1.421875, 1.421875, 1.4375, 1.4375, 1.46875, 1.46875, 1.5, 1.5, 1.53125, 1.53125, 1.546875, 1.546875, 1.5625, 1.578125, 1.578125, 1.59375, 1.59375, 1.625, 1.625, 1.640183323, 1.640183323, 1.640183323, 1.640183323], degree=3))
            Line((6.096, -5.08357062), (6.096, -7.72253105))
            add(Edge.make_bspline(
                [(-6.096, -7.874665385), (-5.811745982, -8.069955065), (-5.191368312, -8.452655749), (-3.271071363, -9.379610796), (-0.11139785, -10.010823197), (3.138794467, -9.363488053), (5.12304575, -8.377449625), (5.814796936, -7.926184012), (6.096, -7.72253105)],
                knots=[1.404521499, 1.404521499, 1.404521499, 1.404521499, 1.420146511, 1.4375, 1.5, 1.5625, 1.583974967, 1.599599961, 1.599599961, 1.599599961, 1.599599961], degree=3))
            Line((-6.096, -7.874665385), (-6.096, -5.334665385))
        make_face()
    boss_extrude7_tool2 = split(extrude(boss_extrude7_sk2.sketch, amount=BOSS_EXTRUDE7_REACH, mode=Mode.PRIVATE), bisect_by=boss_extrude7_end, keep=Keep.BOTH, mode=Mode.PRIVATE)

    add(part_1.part)  # Boss-Extrude7 merges part

    add(body_3.part)  # Boss-Extrude7 merges body 3


with BuildPart() as body_4_1:
    add(body_4.part)

    # Cut-Extrude4: cut by cut_extrude4_tool
    add(cut_extrude4_tool.part, mode=Mode.SUBTRACT)

    # Chamfer4: one chamfer whose edges measure the first distance from different faces: ONE call of the kernel's chamfer builder (chamfer() names one face for all edges)
    chamfer4_edges_1 = [body_4_1.edges().sort_by_distance(p)[0] for p in [
        (9.906, -7.62, -1.524),
    ]]
    chamfer4_side_1 = [body_4_1.faces().sort_by_distance(p)[0] for p in [
        (8.001, -7.62, -1.524),
    ]]
    chamfer4_edges_2 = [body_4_1.edges().sort_by_distance(p)[0] for p in [
        (9.906, 7.62, -1.524),
    ]]
    chamfer4_side_2 = [body_4_1.faces().sort_by_distance(p)[0] for p in [
        (8.001, 7.62, -1.524),
    ]]
    chamfer4 = BRepFilletAPI_MakeChamfer(body_4_1.part.solid().wrapped)
    for e in chamfer4_edges_1:
        chamfer4.Add(CHAMFER4_SIZE, CHAMFER4_SIZE2, e.wrapped, chamfer4_side_1[0].wrapped)  # the first distance lies on this face
    for e in chamfer4_edges_2:
        chamfer4.Add(CHAMFER4_SIZE, CHAMFER4_SIZE2, e.wrapped, chamfer4_side_2[0].wrapped)  # the first distance lies on this face
    add(Compound.cast(chamfer4.Shape()), mode=Mode.REPLACE)


with BuildPart() as body_2_3:
    add(body_2_2.part)

    add(body_4_1.part)  # Boss-Extrude7 merges body 4
    add(boss_extrude7_tool1.solids().sort_by(Axis((5.966385, 6.27751, 0), (0, 0, 1)))[0])
    add(boss_extrude7_tool2.solids().sort_by(Axis((0.034935, -8.049766, 0), (0, 0, 1)))[0])

    # Fillet1
    fillet1_edges = [body_2_3.edges().sort_by_distance(p)[0] for p in [
        (-9.906, 0, 6.359826106),
    ]]
    fillet(fillet1_edges, radius=FILLET1_R)


solid = body_2_3.part
